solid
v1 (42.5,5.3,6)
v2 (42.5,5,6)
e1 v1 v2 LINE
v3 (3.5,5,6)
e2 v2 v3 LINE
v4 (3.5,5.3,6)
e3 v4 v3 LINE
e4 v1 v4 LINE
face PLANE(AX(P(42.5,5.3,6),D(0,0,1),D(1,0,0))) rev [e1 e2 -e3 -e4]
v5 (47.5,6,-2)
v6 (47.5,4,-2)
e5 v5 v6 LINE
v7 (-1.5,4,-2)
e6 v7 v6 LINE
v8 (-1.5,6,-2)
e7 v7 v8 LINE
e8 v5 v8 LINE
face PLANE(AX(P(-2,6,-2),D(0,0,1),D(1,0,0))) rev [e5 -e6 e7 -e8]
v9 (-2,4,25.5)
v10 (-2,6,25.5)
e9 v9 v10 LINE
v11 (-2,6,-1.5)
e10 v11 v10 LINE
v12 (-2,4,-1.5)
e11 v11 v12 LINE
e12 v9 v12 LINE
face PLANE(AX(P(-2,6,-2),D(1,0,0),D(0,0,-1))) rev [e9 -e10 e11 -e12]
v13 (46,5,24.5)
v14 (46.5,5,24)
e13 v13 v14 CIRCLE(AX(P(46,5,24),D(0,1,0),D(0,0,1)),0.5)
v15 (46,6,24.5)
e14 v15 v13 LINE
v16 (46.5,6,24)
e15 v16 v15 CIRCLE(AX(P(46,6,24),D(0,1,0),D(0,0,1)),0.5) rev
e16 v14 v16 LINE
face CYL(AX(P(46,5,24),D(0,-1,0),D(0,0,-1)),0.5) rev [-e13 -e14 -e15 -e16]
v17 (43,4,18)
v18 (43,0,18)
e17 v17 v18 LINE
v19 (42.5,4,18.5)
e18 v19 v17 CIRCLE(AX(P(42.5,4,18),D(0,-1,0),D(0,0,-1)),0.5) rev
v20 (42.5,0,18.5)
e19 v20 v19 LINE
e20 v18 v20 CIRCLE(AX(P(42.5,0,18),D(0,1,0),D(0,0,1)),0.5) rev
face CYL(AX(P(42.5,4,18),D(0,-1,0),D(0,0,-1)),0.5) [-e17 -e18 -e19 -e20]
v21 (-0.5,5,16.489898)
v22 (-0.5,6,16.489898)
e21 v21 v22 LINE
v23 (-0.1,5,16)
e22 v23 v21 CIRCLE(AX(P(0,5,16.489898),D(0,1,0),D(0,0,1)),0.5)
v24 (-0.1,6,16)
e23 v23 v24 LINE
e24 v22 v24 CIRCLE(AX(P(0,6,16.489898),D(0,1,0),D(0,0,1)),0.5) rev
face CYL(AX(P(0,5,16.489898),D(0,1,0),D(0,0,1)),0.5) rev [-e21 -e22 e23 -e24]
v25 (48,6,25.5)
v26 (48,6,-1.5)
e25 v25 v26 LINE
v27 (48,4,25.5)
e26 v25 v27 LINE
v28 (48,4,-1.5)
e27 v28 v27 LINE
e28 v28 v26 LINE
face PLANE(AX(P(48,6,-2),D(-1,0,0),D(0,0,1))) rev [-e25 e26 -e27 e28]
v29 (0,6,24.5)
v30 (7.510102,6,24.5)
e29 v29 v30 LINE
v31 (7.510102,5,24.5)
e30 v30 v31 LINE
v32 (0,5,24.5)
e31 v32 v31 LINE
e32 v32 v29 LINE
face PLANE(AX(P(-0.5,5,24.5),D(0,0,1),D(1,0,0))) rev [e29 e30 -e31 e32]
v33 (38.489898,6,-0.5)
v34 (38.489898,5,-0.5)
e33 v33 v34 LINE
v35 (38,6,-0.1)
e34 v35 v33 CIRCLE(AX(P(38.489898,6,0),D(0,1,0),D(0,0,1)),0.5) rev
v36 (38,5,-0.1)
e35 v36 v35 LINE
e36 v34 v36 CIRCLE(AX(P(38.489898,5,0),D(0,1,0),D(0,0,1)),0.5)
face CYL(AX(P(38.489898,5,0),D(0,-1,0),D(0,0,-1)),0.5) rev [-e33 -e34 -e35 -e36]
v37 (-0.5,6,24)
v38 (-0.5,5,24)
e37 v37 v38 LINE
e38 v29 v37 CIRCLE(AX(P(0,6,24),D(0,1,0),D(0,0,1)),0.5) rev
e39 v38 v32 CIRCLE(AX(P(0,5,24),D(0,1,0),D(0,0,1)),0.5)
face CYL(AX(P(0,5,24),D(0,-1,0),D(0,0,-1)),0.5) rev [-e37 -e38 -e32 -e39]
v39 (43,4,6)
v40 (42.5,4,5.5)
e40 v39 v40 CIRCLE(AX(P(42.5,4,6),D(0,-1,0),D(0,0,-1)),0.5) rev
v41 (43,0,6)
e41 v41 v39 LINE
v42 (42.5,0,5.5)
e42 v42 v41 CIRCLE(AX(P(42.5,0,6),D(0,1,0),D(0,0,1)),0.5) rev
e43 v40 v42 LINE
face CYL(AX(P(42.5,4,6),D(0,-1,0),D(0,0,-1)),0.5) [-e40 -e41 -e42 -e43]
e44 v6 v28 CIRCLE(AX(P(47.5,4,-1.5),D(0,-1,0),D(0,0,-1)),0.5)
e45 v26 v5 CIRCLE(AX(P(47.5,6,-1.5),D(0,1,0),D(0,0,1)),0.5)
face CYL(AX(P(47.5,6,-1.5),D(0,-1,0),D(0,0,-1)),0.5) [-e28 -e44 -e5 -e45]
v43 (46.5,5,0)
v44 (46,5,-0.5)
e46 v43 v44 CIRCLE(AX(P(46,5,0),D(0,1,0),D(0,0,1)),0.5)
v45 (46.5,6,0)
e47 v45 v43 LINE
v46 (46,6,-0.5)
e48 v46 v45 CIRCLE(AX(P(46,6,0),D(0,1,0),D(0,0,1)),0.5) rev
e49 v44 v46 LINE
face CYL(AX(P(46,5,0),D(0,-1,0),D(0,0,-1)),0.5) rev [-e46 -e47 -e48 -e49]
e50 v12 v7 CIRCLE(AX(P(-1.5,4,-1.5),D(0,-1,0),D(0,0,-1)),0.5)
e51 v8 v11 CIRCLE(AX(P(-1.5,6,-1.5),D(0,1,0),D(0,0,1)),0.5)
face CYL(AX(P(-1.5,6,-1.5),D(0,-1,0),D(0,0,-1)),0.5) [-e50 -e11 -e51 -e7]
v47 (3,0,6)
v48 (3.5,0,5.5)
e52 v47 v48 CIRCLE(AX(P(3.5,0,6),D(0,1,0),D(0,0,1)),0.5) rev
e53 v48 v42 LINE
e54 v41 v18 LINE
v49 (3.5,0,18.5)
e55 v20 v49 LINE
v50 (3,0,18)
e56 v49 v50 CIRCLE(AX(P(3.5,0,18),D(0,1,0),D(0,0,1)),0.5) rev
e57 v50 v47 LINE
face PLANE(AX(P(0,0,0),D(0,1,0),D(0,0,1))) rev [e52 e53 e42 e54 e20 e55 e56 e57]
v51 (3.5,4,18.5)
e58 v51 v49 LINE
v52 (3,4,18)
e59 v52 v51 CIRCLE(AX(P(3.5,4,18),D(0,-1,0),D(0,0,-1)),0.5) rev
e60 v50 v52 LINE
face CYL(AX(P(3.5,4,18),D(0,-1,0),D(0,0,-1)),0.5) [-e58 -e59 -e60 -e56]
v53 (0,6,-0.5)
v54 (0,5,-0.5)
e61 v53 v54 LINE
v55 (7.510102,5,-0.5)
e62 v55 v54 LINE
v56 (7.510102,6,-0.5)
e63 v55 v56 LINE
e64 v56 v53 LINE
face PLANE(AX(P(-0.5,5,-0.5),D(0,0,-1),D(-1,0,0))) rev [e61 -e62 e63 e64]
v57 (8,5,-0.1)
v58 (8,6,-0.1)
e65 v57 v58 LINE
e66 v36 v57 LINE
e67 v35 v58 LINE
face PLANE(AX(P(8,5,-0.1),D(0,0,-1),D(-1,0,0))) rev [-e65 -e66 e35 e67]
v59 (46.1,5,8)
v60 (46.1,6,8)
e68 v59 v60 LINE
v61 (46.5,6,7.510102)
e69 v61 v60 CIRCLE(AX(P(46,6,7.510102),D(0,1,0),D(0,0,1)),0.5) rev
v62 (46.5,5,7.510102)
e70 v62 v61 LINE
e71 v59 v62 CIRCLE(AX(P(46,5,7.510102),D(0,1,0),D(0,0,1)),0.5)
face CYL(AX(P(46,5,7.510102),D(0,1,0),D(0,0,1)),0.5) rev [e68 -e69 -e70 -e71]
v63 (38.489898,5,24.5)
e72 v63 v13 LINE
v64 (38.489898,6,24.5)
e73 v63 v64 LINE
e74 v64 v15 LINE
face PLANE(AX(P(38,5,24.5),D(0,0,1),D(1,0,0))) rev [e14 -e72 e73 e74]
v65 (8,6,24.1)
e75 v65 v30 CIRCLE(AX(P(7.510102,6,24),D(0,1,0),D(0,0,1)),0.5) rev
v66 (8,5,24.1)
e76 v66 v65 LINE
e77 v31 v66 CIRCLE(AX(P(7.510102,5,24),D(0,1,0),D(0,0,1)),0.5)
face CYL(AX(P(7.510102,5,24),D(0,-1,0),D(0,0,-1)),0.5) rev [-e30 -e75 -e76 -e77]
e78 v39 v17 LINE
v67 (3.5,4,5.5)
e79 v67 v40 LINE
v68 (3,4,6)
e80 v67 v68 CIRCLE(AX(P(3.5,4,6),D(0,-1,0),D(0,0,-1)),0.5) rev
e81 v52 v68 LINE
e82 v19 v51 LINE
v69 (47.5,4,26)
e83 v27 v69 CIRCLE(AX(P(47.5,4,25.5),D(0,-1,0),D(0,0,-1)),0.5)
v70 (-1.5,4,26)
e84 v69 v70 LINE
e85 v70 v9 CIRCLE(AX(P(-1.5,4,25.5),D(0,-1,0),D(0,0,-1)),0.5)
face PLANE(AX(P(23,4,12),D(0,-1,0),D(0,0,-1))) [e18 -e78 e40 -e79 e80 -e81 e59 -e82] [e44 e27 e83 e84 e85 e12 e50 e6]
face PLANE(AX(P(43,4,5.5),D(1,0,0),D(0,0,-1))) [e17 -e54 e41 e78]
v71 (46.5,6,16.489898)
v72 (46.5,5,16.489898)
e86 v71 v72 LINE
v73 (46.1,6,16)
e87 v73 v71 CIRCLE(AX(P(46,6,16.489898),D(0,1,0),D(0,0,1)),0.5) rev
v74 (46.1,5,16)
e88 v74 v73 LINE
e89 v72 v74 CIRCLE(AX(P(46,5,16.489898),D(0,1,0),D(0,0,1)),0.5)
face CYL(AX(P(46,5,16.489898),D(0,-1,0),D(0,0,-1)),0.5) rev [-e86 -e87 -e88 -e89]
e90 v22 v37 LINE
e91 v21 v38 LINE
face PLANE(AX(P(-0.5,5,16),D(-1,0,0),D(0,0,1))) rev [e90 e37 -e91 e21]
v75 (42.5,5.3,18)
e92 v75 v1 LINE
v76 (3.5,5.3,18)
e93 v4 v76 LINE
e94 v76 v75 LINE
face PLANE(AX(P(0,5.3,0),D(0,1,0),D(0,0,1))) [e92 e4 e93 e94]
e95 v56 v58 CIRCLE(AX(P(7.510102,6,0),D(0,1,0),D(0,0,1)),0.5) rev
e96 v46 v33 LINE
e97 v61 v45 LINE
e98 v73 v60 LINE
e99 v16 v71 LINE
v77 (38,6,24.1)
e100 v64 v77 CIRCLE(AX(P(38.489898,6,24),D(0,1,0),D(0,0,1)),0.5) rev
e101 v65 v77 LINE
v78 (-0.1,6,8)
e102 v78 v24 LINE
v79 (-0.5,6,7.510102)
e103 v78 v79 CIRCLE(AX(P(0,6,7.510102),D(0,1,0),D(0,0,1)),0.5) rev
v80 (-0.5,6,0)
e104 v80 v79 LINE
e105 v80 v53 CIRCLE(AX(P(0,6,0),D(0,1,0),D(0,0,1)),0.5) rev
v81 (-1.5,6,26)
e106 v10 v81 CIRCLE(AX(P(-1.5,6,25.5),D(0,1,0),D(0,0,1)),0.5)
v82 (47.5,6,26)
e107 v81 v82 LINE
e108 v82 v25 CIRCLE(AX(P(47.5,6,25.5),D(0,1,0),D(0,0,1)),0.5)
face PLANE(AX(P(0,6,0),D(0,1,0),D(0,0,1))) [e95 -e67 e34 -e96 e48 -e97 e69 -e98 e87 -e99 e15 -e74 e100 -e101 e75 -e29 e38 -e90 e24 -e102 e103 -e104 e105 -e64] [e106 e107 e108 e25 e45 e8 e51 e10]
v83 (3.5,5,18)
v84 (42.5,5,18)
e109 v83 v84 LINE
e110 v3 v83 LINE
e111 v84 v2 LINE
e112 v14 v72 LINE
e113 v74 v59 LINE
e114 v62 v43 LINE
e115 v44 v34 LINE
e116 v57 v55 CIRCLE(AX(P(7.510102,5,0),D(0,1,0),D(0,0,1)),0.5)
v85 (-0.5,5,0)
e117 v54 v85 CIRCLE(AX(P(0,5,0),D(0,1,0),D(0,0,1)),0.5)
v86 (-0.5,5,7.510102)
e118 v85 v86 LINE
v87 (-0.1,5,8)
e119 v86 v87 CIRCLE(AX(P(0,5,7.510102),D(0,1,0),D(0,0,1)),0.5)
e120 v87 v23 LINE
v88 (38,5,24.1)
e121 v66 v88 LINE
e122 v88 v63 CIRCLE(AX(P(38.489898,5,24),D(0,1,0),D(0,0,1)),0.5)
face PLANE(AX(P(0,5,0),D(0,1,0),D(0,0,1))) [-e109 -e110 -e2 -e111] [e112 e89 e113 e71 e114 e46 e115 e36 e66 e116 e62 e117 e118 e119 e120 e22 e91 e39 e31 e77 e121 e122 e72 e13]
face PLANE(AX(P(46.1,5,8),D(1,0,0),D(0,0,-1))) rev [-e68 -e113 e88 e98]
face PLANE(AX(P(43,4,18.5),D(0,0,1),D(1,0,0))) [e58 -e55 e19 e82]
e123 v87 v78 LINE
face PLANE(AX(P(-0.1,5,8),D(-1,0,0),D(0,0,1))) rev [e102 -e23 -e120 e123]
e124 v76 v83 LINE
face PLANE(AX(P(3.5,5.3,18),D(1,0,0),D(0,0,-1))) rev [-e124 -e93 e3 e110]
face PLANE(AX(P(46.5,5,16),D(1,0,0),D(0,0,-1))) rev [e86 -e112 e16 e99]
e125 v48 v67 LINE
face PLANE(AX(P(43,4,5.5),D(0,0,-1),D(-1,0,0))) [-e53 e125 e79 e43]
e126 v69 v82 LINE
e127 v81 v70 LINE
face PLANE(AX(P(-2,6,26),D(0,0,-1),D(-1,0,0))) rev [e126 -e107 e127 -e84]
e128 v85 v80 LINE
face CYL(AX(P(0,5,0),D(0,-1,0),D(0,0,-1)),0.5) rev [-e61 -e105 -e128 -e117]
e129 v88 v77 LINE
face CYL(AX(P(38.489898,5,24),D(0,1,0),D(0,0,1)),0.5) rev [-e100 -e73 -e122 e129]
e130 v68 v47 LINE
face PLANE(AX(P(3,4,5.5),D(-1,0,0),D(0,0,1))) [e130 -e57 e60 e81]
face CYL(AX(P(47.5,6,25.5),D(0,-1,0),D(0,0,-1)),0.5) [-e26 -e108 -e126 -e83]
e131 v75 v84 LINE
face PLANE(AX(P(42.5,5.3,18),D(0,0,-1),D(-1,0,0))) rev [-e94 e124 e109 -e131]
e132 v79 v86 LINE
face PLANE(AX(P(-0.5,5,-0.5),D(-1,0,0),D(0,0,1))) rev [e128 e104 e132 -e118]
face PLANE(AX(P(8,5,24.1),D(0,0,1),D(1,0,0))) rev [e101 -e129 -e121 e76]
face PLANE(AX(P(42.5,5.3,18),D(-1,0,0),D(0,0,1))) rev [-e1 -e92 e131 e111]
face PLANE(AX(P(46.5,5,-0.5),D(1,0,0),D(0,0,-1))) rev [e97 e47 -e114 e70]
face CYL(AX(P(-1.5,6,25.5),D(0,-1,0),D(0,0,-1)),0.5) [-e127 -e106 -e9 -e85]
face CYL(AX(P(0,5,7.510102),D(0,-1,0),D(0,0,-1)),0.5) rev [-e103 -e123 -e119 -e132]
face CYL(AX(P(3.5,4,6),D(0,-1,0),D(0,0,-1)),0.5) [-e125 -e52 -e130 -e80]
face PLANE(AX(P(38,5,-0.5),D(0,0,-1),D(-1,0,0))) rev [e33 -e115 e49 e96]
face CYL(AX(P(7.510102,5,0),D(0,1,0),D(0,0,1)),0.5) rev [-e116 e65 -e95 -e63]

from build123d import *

# Parameters (mm, degrees)
SKETCH_1_W           = 50
SKETCH_1_H           = 28
EXTRUDE_1_DEPTH      = 6
CUT_EXTRUDE_1_DEPTH  = 1
FILLET_3_R           = 0.5
SKETCH_5_OUTSIDE_W   = 63.524
SKETCH_5_OUTSIDE_H   = 41.524
SKETCH_5_OUTSIDE_W_2 = 40
SKETCH_5_OUTSIDE_H_2 = 13
CUT_EXTRUDE_2_DEPTH  = 4
FILLET_1_R           = 0.5
SKETCH_6_W           = 39
SKETCH_6_H           = 12
EXTRUDE_2_DEPTH      = 0.3


with BuildPart() as part:
    # 草图1 → 凸台-拉伸1 (new body)
    with BuildSketch(Plane(origin=(0, 0, 0), x_dir=(1, 0, 0), z_dir=(0, 1, 0))):
        with Locations((23, -12)):
            Rectangle(SKETCH_1_W, SKETCH_1_H)
    extrude(amount=EXTRUDE_1_DEPTH)

    # 草图3 → 切除-拉伸1 (cut)
    with BuildSketch(Plane(origin=(0, 6, 0), x_dir=(1, 0, 0), z_dir=(0, 1, 0))):
        Polygon((-0.5, 0.5), (8, 0.5), (8, 0.1), (38, 0.1), (38, 0.5), (46.5, 0.5), (46.5, -8), (46.1, -8), (46.1, -16), (46.5, -16), (46.5, -24.5), (38, -24.5), (38, -24.1), (8, -24.1), (8, -24.5), (-0.5, -24.5), (-0.5, -16), (-0.1, -16), (-0.1, -8), (-0.5, -8), align=None)
    extrude(amount=-CUT_EXTRUDE_1_DEPTH, mode=Mode.SUBTRACT)

    # 圆角3
    # the kernel refuses this fillet: 0.5 mm, written as the material it adds along each edge
    with BuildSketch(Plane(origin=(38, 6, -0.5), x_dir=(1.6520118606416786e-12, 0, 1.0), z_dir=(0, -1, 0)), Plane(origin=(46.5, 6, 16), x_dir=(-1.0, 0, 1.5276668818837323e-12), z_dir=(0, -1, 0)), Plane(origin=(8, 6, 24.5), x_dir=(-1.5765166949672239e-12, 0, -1.0), z_dir=(0, -1, 0)), Plane(origin=(-0.5, 6, 8), x_dir=(1.0, 0, -1.5831780331149617e-12), z_dir=(0, -1, 0))) as fillet_3_piece_1:
        with BuildLine():
            CenterArc((0.5, -0.489897949), FILLET_3_R, 101.536959033, 78.463040967)
            Line((0, -0.489897949), (-0.01, -0.489897949))
            Line((-0.01, -0.489897949), (-0.01, 0))
            Line((-0.01, 0), (0, 0.01))
            ThreePointArc((0, 0.01), (0.2, 0.01), (0.398, 0.009797959))
            Line((0.398, 0.009797959), (0.4, 0))
        make_face()
    extrude(amount=2.224744871)
    with BuildSketch(Plane(origin=(46.5, 6, 8), x_dir=(0, 0, -1), z_dir=(0, -1, 0)), Plane(origin=(38, 6, 24.5), x_dir=(1, 0, 0), z_dir=(0, -1, 0)), Plane(origin=(-0.5, 6, 16), x_dir=(0, 0, 1), z_dir=(0, -1, 0)), Plane(origin=(8, 6, -0.5), x_dir=(-1, 0, 0), z_dir=(0, -1, 0))) as fillet_3_piece_2:
        with BuildLine():
            CenterArc((0.489897949, -0.5), FILLET_3_R, 90, 78.463040967)
            Line((0, -0.4), (-0.009797959, -0.398))
            ThreePointArc((-0.009797959, -0.398), (-0.01, -0.2), (-0.01, 0))
            Line((-0.01, 0), (0, 0.01))
            Line((0, 0.01), (0.489897949, 0.01))
            Line((0.489897949, 0.01), (0.489897949, 0))
        make_face()
    extrude(amount=2.224744871)
    with BuildSketch(Plane(origin=(46.5, 6, -0.5), x_dir=(-1, 0, 0), z_dir=(0, -1, 0)), Plane(origin=(46.5, 6, 24.5), x_dir=(0, 0, -1), z_dir=(0, -1, 0)), Plane(origin=(-0.5, 6, 24.5), x_dir=(1, 0, 0), z_dir=(0, -1, 0))) as fillet_3_piece_3:
        with BuildLine():
            CenterArc((FILLET_3_R, -FILLET_3_R), FILLET_3_R, 90, 90)
            Line((0, -FILLET_3_R), (-FILLET_3_R * 0.02, -FILLET_3_R))
            Line((-FILLET_3_R * 0.02, -FILLET_3_R), (-FILLET_3_R * 0.02, FILLET_3_R * 0.02))
            Line((-FILLET_3_R * 0.02, FILLET_3_R * 0.02), (FILLET_3_R, FILLET_3_R * 0.02))
            Line((FILLET_3_R, FILLET_3_R * 0.02), (FILLET_3_R, 0))
        make_face()
    extrude(amount=2.25)
    with BuildSketch(Plane(origin=(-0.5, 6, -0.5), x_dir=(1, 0, 0), z_dir=(0, -1, 0))) as fillet_3_piece_4:
        with BuildLine():
            CenterArc((FILLET_3_R, FILLET_3_R), FILLET_3_R, 180, 90)
            Line((0, FILLET_3_R), (-FILLET_3_R * 0.02, FILLET_3_R))
            Line((-FILLET_3_R * 0.02, FILLET_3_R), (-FILLET_3_R * 0.02, -FILLET_3_R * 0.02))
            Line((-FILLET_3_R * 0.02, -FILLET_3_R * 0.02), (FILLET_3_R, -FILLET_3_R * 0.02))
            Line((FILLET_3_R, -FILLET_3_R * 0.02), (FILLET_3_R, 0))
        make_face()
    extrude(amount=2.25)

    # 草图5 outside → 切除-拉伸2 (cut)
    with BuildSketch(Plane(origin=(0, 0, 0), x_dir=(-1, 0, 0), z_dir=(0, -1, 0))):
        with Locations((-23, -12)):
            Rectangle(SKETCH_5_OUTSIDE_W, SKETCH_5_OUTSIDE_H)
        with Locations((-23, -12)):
            Rectangle(SKETCH_5_OUTSIDE_W_2, SKETCH_5_OUTSIDE_H_2, mode=Mode.SUBTRACT)
    extrude(amount=-CUT_EXTRUDE_2_DEPTH, mode=Mode.SUBTRACT)

    # 圆角1
    fillet_1_edges = [part.edges().sort_by_distance(p)[0] for p in [
        (43, 2, 5.5),
        (3, 2, 5.5),
        (3, 2, 18.5),
        (43, 2, 18.5),
        (-2, 5, -2),
        (48, 5, -2),
        (48, 5, 26),
        (-2, 5, 26),
    ]]
    fillet(fillet_1_edges, radius=FILLET_1_R)

    # 草图6 → 凸台-拉伸2 (add)
    with BuildSketch(Plane(origin=(0, 5, 0), x_dir=(1, 0, 0), z_dir=(0, 1, 0))):
        with Locations((23, -12)):
            Rectangle(SKETCH_6_W, SKETCH_6_H)
    extrude(amount=EXTRUDE_2_DEPTH)


solid = part.part
